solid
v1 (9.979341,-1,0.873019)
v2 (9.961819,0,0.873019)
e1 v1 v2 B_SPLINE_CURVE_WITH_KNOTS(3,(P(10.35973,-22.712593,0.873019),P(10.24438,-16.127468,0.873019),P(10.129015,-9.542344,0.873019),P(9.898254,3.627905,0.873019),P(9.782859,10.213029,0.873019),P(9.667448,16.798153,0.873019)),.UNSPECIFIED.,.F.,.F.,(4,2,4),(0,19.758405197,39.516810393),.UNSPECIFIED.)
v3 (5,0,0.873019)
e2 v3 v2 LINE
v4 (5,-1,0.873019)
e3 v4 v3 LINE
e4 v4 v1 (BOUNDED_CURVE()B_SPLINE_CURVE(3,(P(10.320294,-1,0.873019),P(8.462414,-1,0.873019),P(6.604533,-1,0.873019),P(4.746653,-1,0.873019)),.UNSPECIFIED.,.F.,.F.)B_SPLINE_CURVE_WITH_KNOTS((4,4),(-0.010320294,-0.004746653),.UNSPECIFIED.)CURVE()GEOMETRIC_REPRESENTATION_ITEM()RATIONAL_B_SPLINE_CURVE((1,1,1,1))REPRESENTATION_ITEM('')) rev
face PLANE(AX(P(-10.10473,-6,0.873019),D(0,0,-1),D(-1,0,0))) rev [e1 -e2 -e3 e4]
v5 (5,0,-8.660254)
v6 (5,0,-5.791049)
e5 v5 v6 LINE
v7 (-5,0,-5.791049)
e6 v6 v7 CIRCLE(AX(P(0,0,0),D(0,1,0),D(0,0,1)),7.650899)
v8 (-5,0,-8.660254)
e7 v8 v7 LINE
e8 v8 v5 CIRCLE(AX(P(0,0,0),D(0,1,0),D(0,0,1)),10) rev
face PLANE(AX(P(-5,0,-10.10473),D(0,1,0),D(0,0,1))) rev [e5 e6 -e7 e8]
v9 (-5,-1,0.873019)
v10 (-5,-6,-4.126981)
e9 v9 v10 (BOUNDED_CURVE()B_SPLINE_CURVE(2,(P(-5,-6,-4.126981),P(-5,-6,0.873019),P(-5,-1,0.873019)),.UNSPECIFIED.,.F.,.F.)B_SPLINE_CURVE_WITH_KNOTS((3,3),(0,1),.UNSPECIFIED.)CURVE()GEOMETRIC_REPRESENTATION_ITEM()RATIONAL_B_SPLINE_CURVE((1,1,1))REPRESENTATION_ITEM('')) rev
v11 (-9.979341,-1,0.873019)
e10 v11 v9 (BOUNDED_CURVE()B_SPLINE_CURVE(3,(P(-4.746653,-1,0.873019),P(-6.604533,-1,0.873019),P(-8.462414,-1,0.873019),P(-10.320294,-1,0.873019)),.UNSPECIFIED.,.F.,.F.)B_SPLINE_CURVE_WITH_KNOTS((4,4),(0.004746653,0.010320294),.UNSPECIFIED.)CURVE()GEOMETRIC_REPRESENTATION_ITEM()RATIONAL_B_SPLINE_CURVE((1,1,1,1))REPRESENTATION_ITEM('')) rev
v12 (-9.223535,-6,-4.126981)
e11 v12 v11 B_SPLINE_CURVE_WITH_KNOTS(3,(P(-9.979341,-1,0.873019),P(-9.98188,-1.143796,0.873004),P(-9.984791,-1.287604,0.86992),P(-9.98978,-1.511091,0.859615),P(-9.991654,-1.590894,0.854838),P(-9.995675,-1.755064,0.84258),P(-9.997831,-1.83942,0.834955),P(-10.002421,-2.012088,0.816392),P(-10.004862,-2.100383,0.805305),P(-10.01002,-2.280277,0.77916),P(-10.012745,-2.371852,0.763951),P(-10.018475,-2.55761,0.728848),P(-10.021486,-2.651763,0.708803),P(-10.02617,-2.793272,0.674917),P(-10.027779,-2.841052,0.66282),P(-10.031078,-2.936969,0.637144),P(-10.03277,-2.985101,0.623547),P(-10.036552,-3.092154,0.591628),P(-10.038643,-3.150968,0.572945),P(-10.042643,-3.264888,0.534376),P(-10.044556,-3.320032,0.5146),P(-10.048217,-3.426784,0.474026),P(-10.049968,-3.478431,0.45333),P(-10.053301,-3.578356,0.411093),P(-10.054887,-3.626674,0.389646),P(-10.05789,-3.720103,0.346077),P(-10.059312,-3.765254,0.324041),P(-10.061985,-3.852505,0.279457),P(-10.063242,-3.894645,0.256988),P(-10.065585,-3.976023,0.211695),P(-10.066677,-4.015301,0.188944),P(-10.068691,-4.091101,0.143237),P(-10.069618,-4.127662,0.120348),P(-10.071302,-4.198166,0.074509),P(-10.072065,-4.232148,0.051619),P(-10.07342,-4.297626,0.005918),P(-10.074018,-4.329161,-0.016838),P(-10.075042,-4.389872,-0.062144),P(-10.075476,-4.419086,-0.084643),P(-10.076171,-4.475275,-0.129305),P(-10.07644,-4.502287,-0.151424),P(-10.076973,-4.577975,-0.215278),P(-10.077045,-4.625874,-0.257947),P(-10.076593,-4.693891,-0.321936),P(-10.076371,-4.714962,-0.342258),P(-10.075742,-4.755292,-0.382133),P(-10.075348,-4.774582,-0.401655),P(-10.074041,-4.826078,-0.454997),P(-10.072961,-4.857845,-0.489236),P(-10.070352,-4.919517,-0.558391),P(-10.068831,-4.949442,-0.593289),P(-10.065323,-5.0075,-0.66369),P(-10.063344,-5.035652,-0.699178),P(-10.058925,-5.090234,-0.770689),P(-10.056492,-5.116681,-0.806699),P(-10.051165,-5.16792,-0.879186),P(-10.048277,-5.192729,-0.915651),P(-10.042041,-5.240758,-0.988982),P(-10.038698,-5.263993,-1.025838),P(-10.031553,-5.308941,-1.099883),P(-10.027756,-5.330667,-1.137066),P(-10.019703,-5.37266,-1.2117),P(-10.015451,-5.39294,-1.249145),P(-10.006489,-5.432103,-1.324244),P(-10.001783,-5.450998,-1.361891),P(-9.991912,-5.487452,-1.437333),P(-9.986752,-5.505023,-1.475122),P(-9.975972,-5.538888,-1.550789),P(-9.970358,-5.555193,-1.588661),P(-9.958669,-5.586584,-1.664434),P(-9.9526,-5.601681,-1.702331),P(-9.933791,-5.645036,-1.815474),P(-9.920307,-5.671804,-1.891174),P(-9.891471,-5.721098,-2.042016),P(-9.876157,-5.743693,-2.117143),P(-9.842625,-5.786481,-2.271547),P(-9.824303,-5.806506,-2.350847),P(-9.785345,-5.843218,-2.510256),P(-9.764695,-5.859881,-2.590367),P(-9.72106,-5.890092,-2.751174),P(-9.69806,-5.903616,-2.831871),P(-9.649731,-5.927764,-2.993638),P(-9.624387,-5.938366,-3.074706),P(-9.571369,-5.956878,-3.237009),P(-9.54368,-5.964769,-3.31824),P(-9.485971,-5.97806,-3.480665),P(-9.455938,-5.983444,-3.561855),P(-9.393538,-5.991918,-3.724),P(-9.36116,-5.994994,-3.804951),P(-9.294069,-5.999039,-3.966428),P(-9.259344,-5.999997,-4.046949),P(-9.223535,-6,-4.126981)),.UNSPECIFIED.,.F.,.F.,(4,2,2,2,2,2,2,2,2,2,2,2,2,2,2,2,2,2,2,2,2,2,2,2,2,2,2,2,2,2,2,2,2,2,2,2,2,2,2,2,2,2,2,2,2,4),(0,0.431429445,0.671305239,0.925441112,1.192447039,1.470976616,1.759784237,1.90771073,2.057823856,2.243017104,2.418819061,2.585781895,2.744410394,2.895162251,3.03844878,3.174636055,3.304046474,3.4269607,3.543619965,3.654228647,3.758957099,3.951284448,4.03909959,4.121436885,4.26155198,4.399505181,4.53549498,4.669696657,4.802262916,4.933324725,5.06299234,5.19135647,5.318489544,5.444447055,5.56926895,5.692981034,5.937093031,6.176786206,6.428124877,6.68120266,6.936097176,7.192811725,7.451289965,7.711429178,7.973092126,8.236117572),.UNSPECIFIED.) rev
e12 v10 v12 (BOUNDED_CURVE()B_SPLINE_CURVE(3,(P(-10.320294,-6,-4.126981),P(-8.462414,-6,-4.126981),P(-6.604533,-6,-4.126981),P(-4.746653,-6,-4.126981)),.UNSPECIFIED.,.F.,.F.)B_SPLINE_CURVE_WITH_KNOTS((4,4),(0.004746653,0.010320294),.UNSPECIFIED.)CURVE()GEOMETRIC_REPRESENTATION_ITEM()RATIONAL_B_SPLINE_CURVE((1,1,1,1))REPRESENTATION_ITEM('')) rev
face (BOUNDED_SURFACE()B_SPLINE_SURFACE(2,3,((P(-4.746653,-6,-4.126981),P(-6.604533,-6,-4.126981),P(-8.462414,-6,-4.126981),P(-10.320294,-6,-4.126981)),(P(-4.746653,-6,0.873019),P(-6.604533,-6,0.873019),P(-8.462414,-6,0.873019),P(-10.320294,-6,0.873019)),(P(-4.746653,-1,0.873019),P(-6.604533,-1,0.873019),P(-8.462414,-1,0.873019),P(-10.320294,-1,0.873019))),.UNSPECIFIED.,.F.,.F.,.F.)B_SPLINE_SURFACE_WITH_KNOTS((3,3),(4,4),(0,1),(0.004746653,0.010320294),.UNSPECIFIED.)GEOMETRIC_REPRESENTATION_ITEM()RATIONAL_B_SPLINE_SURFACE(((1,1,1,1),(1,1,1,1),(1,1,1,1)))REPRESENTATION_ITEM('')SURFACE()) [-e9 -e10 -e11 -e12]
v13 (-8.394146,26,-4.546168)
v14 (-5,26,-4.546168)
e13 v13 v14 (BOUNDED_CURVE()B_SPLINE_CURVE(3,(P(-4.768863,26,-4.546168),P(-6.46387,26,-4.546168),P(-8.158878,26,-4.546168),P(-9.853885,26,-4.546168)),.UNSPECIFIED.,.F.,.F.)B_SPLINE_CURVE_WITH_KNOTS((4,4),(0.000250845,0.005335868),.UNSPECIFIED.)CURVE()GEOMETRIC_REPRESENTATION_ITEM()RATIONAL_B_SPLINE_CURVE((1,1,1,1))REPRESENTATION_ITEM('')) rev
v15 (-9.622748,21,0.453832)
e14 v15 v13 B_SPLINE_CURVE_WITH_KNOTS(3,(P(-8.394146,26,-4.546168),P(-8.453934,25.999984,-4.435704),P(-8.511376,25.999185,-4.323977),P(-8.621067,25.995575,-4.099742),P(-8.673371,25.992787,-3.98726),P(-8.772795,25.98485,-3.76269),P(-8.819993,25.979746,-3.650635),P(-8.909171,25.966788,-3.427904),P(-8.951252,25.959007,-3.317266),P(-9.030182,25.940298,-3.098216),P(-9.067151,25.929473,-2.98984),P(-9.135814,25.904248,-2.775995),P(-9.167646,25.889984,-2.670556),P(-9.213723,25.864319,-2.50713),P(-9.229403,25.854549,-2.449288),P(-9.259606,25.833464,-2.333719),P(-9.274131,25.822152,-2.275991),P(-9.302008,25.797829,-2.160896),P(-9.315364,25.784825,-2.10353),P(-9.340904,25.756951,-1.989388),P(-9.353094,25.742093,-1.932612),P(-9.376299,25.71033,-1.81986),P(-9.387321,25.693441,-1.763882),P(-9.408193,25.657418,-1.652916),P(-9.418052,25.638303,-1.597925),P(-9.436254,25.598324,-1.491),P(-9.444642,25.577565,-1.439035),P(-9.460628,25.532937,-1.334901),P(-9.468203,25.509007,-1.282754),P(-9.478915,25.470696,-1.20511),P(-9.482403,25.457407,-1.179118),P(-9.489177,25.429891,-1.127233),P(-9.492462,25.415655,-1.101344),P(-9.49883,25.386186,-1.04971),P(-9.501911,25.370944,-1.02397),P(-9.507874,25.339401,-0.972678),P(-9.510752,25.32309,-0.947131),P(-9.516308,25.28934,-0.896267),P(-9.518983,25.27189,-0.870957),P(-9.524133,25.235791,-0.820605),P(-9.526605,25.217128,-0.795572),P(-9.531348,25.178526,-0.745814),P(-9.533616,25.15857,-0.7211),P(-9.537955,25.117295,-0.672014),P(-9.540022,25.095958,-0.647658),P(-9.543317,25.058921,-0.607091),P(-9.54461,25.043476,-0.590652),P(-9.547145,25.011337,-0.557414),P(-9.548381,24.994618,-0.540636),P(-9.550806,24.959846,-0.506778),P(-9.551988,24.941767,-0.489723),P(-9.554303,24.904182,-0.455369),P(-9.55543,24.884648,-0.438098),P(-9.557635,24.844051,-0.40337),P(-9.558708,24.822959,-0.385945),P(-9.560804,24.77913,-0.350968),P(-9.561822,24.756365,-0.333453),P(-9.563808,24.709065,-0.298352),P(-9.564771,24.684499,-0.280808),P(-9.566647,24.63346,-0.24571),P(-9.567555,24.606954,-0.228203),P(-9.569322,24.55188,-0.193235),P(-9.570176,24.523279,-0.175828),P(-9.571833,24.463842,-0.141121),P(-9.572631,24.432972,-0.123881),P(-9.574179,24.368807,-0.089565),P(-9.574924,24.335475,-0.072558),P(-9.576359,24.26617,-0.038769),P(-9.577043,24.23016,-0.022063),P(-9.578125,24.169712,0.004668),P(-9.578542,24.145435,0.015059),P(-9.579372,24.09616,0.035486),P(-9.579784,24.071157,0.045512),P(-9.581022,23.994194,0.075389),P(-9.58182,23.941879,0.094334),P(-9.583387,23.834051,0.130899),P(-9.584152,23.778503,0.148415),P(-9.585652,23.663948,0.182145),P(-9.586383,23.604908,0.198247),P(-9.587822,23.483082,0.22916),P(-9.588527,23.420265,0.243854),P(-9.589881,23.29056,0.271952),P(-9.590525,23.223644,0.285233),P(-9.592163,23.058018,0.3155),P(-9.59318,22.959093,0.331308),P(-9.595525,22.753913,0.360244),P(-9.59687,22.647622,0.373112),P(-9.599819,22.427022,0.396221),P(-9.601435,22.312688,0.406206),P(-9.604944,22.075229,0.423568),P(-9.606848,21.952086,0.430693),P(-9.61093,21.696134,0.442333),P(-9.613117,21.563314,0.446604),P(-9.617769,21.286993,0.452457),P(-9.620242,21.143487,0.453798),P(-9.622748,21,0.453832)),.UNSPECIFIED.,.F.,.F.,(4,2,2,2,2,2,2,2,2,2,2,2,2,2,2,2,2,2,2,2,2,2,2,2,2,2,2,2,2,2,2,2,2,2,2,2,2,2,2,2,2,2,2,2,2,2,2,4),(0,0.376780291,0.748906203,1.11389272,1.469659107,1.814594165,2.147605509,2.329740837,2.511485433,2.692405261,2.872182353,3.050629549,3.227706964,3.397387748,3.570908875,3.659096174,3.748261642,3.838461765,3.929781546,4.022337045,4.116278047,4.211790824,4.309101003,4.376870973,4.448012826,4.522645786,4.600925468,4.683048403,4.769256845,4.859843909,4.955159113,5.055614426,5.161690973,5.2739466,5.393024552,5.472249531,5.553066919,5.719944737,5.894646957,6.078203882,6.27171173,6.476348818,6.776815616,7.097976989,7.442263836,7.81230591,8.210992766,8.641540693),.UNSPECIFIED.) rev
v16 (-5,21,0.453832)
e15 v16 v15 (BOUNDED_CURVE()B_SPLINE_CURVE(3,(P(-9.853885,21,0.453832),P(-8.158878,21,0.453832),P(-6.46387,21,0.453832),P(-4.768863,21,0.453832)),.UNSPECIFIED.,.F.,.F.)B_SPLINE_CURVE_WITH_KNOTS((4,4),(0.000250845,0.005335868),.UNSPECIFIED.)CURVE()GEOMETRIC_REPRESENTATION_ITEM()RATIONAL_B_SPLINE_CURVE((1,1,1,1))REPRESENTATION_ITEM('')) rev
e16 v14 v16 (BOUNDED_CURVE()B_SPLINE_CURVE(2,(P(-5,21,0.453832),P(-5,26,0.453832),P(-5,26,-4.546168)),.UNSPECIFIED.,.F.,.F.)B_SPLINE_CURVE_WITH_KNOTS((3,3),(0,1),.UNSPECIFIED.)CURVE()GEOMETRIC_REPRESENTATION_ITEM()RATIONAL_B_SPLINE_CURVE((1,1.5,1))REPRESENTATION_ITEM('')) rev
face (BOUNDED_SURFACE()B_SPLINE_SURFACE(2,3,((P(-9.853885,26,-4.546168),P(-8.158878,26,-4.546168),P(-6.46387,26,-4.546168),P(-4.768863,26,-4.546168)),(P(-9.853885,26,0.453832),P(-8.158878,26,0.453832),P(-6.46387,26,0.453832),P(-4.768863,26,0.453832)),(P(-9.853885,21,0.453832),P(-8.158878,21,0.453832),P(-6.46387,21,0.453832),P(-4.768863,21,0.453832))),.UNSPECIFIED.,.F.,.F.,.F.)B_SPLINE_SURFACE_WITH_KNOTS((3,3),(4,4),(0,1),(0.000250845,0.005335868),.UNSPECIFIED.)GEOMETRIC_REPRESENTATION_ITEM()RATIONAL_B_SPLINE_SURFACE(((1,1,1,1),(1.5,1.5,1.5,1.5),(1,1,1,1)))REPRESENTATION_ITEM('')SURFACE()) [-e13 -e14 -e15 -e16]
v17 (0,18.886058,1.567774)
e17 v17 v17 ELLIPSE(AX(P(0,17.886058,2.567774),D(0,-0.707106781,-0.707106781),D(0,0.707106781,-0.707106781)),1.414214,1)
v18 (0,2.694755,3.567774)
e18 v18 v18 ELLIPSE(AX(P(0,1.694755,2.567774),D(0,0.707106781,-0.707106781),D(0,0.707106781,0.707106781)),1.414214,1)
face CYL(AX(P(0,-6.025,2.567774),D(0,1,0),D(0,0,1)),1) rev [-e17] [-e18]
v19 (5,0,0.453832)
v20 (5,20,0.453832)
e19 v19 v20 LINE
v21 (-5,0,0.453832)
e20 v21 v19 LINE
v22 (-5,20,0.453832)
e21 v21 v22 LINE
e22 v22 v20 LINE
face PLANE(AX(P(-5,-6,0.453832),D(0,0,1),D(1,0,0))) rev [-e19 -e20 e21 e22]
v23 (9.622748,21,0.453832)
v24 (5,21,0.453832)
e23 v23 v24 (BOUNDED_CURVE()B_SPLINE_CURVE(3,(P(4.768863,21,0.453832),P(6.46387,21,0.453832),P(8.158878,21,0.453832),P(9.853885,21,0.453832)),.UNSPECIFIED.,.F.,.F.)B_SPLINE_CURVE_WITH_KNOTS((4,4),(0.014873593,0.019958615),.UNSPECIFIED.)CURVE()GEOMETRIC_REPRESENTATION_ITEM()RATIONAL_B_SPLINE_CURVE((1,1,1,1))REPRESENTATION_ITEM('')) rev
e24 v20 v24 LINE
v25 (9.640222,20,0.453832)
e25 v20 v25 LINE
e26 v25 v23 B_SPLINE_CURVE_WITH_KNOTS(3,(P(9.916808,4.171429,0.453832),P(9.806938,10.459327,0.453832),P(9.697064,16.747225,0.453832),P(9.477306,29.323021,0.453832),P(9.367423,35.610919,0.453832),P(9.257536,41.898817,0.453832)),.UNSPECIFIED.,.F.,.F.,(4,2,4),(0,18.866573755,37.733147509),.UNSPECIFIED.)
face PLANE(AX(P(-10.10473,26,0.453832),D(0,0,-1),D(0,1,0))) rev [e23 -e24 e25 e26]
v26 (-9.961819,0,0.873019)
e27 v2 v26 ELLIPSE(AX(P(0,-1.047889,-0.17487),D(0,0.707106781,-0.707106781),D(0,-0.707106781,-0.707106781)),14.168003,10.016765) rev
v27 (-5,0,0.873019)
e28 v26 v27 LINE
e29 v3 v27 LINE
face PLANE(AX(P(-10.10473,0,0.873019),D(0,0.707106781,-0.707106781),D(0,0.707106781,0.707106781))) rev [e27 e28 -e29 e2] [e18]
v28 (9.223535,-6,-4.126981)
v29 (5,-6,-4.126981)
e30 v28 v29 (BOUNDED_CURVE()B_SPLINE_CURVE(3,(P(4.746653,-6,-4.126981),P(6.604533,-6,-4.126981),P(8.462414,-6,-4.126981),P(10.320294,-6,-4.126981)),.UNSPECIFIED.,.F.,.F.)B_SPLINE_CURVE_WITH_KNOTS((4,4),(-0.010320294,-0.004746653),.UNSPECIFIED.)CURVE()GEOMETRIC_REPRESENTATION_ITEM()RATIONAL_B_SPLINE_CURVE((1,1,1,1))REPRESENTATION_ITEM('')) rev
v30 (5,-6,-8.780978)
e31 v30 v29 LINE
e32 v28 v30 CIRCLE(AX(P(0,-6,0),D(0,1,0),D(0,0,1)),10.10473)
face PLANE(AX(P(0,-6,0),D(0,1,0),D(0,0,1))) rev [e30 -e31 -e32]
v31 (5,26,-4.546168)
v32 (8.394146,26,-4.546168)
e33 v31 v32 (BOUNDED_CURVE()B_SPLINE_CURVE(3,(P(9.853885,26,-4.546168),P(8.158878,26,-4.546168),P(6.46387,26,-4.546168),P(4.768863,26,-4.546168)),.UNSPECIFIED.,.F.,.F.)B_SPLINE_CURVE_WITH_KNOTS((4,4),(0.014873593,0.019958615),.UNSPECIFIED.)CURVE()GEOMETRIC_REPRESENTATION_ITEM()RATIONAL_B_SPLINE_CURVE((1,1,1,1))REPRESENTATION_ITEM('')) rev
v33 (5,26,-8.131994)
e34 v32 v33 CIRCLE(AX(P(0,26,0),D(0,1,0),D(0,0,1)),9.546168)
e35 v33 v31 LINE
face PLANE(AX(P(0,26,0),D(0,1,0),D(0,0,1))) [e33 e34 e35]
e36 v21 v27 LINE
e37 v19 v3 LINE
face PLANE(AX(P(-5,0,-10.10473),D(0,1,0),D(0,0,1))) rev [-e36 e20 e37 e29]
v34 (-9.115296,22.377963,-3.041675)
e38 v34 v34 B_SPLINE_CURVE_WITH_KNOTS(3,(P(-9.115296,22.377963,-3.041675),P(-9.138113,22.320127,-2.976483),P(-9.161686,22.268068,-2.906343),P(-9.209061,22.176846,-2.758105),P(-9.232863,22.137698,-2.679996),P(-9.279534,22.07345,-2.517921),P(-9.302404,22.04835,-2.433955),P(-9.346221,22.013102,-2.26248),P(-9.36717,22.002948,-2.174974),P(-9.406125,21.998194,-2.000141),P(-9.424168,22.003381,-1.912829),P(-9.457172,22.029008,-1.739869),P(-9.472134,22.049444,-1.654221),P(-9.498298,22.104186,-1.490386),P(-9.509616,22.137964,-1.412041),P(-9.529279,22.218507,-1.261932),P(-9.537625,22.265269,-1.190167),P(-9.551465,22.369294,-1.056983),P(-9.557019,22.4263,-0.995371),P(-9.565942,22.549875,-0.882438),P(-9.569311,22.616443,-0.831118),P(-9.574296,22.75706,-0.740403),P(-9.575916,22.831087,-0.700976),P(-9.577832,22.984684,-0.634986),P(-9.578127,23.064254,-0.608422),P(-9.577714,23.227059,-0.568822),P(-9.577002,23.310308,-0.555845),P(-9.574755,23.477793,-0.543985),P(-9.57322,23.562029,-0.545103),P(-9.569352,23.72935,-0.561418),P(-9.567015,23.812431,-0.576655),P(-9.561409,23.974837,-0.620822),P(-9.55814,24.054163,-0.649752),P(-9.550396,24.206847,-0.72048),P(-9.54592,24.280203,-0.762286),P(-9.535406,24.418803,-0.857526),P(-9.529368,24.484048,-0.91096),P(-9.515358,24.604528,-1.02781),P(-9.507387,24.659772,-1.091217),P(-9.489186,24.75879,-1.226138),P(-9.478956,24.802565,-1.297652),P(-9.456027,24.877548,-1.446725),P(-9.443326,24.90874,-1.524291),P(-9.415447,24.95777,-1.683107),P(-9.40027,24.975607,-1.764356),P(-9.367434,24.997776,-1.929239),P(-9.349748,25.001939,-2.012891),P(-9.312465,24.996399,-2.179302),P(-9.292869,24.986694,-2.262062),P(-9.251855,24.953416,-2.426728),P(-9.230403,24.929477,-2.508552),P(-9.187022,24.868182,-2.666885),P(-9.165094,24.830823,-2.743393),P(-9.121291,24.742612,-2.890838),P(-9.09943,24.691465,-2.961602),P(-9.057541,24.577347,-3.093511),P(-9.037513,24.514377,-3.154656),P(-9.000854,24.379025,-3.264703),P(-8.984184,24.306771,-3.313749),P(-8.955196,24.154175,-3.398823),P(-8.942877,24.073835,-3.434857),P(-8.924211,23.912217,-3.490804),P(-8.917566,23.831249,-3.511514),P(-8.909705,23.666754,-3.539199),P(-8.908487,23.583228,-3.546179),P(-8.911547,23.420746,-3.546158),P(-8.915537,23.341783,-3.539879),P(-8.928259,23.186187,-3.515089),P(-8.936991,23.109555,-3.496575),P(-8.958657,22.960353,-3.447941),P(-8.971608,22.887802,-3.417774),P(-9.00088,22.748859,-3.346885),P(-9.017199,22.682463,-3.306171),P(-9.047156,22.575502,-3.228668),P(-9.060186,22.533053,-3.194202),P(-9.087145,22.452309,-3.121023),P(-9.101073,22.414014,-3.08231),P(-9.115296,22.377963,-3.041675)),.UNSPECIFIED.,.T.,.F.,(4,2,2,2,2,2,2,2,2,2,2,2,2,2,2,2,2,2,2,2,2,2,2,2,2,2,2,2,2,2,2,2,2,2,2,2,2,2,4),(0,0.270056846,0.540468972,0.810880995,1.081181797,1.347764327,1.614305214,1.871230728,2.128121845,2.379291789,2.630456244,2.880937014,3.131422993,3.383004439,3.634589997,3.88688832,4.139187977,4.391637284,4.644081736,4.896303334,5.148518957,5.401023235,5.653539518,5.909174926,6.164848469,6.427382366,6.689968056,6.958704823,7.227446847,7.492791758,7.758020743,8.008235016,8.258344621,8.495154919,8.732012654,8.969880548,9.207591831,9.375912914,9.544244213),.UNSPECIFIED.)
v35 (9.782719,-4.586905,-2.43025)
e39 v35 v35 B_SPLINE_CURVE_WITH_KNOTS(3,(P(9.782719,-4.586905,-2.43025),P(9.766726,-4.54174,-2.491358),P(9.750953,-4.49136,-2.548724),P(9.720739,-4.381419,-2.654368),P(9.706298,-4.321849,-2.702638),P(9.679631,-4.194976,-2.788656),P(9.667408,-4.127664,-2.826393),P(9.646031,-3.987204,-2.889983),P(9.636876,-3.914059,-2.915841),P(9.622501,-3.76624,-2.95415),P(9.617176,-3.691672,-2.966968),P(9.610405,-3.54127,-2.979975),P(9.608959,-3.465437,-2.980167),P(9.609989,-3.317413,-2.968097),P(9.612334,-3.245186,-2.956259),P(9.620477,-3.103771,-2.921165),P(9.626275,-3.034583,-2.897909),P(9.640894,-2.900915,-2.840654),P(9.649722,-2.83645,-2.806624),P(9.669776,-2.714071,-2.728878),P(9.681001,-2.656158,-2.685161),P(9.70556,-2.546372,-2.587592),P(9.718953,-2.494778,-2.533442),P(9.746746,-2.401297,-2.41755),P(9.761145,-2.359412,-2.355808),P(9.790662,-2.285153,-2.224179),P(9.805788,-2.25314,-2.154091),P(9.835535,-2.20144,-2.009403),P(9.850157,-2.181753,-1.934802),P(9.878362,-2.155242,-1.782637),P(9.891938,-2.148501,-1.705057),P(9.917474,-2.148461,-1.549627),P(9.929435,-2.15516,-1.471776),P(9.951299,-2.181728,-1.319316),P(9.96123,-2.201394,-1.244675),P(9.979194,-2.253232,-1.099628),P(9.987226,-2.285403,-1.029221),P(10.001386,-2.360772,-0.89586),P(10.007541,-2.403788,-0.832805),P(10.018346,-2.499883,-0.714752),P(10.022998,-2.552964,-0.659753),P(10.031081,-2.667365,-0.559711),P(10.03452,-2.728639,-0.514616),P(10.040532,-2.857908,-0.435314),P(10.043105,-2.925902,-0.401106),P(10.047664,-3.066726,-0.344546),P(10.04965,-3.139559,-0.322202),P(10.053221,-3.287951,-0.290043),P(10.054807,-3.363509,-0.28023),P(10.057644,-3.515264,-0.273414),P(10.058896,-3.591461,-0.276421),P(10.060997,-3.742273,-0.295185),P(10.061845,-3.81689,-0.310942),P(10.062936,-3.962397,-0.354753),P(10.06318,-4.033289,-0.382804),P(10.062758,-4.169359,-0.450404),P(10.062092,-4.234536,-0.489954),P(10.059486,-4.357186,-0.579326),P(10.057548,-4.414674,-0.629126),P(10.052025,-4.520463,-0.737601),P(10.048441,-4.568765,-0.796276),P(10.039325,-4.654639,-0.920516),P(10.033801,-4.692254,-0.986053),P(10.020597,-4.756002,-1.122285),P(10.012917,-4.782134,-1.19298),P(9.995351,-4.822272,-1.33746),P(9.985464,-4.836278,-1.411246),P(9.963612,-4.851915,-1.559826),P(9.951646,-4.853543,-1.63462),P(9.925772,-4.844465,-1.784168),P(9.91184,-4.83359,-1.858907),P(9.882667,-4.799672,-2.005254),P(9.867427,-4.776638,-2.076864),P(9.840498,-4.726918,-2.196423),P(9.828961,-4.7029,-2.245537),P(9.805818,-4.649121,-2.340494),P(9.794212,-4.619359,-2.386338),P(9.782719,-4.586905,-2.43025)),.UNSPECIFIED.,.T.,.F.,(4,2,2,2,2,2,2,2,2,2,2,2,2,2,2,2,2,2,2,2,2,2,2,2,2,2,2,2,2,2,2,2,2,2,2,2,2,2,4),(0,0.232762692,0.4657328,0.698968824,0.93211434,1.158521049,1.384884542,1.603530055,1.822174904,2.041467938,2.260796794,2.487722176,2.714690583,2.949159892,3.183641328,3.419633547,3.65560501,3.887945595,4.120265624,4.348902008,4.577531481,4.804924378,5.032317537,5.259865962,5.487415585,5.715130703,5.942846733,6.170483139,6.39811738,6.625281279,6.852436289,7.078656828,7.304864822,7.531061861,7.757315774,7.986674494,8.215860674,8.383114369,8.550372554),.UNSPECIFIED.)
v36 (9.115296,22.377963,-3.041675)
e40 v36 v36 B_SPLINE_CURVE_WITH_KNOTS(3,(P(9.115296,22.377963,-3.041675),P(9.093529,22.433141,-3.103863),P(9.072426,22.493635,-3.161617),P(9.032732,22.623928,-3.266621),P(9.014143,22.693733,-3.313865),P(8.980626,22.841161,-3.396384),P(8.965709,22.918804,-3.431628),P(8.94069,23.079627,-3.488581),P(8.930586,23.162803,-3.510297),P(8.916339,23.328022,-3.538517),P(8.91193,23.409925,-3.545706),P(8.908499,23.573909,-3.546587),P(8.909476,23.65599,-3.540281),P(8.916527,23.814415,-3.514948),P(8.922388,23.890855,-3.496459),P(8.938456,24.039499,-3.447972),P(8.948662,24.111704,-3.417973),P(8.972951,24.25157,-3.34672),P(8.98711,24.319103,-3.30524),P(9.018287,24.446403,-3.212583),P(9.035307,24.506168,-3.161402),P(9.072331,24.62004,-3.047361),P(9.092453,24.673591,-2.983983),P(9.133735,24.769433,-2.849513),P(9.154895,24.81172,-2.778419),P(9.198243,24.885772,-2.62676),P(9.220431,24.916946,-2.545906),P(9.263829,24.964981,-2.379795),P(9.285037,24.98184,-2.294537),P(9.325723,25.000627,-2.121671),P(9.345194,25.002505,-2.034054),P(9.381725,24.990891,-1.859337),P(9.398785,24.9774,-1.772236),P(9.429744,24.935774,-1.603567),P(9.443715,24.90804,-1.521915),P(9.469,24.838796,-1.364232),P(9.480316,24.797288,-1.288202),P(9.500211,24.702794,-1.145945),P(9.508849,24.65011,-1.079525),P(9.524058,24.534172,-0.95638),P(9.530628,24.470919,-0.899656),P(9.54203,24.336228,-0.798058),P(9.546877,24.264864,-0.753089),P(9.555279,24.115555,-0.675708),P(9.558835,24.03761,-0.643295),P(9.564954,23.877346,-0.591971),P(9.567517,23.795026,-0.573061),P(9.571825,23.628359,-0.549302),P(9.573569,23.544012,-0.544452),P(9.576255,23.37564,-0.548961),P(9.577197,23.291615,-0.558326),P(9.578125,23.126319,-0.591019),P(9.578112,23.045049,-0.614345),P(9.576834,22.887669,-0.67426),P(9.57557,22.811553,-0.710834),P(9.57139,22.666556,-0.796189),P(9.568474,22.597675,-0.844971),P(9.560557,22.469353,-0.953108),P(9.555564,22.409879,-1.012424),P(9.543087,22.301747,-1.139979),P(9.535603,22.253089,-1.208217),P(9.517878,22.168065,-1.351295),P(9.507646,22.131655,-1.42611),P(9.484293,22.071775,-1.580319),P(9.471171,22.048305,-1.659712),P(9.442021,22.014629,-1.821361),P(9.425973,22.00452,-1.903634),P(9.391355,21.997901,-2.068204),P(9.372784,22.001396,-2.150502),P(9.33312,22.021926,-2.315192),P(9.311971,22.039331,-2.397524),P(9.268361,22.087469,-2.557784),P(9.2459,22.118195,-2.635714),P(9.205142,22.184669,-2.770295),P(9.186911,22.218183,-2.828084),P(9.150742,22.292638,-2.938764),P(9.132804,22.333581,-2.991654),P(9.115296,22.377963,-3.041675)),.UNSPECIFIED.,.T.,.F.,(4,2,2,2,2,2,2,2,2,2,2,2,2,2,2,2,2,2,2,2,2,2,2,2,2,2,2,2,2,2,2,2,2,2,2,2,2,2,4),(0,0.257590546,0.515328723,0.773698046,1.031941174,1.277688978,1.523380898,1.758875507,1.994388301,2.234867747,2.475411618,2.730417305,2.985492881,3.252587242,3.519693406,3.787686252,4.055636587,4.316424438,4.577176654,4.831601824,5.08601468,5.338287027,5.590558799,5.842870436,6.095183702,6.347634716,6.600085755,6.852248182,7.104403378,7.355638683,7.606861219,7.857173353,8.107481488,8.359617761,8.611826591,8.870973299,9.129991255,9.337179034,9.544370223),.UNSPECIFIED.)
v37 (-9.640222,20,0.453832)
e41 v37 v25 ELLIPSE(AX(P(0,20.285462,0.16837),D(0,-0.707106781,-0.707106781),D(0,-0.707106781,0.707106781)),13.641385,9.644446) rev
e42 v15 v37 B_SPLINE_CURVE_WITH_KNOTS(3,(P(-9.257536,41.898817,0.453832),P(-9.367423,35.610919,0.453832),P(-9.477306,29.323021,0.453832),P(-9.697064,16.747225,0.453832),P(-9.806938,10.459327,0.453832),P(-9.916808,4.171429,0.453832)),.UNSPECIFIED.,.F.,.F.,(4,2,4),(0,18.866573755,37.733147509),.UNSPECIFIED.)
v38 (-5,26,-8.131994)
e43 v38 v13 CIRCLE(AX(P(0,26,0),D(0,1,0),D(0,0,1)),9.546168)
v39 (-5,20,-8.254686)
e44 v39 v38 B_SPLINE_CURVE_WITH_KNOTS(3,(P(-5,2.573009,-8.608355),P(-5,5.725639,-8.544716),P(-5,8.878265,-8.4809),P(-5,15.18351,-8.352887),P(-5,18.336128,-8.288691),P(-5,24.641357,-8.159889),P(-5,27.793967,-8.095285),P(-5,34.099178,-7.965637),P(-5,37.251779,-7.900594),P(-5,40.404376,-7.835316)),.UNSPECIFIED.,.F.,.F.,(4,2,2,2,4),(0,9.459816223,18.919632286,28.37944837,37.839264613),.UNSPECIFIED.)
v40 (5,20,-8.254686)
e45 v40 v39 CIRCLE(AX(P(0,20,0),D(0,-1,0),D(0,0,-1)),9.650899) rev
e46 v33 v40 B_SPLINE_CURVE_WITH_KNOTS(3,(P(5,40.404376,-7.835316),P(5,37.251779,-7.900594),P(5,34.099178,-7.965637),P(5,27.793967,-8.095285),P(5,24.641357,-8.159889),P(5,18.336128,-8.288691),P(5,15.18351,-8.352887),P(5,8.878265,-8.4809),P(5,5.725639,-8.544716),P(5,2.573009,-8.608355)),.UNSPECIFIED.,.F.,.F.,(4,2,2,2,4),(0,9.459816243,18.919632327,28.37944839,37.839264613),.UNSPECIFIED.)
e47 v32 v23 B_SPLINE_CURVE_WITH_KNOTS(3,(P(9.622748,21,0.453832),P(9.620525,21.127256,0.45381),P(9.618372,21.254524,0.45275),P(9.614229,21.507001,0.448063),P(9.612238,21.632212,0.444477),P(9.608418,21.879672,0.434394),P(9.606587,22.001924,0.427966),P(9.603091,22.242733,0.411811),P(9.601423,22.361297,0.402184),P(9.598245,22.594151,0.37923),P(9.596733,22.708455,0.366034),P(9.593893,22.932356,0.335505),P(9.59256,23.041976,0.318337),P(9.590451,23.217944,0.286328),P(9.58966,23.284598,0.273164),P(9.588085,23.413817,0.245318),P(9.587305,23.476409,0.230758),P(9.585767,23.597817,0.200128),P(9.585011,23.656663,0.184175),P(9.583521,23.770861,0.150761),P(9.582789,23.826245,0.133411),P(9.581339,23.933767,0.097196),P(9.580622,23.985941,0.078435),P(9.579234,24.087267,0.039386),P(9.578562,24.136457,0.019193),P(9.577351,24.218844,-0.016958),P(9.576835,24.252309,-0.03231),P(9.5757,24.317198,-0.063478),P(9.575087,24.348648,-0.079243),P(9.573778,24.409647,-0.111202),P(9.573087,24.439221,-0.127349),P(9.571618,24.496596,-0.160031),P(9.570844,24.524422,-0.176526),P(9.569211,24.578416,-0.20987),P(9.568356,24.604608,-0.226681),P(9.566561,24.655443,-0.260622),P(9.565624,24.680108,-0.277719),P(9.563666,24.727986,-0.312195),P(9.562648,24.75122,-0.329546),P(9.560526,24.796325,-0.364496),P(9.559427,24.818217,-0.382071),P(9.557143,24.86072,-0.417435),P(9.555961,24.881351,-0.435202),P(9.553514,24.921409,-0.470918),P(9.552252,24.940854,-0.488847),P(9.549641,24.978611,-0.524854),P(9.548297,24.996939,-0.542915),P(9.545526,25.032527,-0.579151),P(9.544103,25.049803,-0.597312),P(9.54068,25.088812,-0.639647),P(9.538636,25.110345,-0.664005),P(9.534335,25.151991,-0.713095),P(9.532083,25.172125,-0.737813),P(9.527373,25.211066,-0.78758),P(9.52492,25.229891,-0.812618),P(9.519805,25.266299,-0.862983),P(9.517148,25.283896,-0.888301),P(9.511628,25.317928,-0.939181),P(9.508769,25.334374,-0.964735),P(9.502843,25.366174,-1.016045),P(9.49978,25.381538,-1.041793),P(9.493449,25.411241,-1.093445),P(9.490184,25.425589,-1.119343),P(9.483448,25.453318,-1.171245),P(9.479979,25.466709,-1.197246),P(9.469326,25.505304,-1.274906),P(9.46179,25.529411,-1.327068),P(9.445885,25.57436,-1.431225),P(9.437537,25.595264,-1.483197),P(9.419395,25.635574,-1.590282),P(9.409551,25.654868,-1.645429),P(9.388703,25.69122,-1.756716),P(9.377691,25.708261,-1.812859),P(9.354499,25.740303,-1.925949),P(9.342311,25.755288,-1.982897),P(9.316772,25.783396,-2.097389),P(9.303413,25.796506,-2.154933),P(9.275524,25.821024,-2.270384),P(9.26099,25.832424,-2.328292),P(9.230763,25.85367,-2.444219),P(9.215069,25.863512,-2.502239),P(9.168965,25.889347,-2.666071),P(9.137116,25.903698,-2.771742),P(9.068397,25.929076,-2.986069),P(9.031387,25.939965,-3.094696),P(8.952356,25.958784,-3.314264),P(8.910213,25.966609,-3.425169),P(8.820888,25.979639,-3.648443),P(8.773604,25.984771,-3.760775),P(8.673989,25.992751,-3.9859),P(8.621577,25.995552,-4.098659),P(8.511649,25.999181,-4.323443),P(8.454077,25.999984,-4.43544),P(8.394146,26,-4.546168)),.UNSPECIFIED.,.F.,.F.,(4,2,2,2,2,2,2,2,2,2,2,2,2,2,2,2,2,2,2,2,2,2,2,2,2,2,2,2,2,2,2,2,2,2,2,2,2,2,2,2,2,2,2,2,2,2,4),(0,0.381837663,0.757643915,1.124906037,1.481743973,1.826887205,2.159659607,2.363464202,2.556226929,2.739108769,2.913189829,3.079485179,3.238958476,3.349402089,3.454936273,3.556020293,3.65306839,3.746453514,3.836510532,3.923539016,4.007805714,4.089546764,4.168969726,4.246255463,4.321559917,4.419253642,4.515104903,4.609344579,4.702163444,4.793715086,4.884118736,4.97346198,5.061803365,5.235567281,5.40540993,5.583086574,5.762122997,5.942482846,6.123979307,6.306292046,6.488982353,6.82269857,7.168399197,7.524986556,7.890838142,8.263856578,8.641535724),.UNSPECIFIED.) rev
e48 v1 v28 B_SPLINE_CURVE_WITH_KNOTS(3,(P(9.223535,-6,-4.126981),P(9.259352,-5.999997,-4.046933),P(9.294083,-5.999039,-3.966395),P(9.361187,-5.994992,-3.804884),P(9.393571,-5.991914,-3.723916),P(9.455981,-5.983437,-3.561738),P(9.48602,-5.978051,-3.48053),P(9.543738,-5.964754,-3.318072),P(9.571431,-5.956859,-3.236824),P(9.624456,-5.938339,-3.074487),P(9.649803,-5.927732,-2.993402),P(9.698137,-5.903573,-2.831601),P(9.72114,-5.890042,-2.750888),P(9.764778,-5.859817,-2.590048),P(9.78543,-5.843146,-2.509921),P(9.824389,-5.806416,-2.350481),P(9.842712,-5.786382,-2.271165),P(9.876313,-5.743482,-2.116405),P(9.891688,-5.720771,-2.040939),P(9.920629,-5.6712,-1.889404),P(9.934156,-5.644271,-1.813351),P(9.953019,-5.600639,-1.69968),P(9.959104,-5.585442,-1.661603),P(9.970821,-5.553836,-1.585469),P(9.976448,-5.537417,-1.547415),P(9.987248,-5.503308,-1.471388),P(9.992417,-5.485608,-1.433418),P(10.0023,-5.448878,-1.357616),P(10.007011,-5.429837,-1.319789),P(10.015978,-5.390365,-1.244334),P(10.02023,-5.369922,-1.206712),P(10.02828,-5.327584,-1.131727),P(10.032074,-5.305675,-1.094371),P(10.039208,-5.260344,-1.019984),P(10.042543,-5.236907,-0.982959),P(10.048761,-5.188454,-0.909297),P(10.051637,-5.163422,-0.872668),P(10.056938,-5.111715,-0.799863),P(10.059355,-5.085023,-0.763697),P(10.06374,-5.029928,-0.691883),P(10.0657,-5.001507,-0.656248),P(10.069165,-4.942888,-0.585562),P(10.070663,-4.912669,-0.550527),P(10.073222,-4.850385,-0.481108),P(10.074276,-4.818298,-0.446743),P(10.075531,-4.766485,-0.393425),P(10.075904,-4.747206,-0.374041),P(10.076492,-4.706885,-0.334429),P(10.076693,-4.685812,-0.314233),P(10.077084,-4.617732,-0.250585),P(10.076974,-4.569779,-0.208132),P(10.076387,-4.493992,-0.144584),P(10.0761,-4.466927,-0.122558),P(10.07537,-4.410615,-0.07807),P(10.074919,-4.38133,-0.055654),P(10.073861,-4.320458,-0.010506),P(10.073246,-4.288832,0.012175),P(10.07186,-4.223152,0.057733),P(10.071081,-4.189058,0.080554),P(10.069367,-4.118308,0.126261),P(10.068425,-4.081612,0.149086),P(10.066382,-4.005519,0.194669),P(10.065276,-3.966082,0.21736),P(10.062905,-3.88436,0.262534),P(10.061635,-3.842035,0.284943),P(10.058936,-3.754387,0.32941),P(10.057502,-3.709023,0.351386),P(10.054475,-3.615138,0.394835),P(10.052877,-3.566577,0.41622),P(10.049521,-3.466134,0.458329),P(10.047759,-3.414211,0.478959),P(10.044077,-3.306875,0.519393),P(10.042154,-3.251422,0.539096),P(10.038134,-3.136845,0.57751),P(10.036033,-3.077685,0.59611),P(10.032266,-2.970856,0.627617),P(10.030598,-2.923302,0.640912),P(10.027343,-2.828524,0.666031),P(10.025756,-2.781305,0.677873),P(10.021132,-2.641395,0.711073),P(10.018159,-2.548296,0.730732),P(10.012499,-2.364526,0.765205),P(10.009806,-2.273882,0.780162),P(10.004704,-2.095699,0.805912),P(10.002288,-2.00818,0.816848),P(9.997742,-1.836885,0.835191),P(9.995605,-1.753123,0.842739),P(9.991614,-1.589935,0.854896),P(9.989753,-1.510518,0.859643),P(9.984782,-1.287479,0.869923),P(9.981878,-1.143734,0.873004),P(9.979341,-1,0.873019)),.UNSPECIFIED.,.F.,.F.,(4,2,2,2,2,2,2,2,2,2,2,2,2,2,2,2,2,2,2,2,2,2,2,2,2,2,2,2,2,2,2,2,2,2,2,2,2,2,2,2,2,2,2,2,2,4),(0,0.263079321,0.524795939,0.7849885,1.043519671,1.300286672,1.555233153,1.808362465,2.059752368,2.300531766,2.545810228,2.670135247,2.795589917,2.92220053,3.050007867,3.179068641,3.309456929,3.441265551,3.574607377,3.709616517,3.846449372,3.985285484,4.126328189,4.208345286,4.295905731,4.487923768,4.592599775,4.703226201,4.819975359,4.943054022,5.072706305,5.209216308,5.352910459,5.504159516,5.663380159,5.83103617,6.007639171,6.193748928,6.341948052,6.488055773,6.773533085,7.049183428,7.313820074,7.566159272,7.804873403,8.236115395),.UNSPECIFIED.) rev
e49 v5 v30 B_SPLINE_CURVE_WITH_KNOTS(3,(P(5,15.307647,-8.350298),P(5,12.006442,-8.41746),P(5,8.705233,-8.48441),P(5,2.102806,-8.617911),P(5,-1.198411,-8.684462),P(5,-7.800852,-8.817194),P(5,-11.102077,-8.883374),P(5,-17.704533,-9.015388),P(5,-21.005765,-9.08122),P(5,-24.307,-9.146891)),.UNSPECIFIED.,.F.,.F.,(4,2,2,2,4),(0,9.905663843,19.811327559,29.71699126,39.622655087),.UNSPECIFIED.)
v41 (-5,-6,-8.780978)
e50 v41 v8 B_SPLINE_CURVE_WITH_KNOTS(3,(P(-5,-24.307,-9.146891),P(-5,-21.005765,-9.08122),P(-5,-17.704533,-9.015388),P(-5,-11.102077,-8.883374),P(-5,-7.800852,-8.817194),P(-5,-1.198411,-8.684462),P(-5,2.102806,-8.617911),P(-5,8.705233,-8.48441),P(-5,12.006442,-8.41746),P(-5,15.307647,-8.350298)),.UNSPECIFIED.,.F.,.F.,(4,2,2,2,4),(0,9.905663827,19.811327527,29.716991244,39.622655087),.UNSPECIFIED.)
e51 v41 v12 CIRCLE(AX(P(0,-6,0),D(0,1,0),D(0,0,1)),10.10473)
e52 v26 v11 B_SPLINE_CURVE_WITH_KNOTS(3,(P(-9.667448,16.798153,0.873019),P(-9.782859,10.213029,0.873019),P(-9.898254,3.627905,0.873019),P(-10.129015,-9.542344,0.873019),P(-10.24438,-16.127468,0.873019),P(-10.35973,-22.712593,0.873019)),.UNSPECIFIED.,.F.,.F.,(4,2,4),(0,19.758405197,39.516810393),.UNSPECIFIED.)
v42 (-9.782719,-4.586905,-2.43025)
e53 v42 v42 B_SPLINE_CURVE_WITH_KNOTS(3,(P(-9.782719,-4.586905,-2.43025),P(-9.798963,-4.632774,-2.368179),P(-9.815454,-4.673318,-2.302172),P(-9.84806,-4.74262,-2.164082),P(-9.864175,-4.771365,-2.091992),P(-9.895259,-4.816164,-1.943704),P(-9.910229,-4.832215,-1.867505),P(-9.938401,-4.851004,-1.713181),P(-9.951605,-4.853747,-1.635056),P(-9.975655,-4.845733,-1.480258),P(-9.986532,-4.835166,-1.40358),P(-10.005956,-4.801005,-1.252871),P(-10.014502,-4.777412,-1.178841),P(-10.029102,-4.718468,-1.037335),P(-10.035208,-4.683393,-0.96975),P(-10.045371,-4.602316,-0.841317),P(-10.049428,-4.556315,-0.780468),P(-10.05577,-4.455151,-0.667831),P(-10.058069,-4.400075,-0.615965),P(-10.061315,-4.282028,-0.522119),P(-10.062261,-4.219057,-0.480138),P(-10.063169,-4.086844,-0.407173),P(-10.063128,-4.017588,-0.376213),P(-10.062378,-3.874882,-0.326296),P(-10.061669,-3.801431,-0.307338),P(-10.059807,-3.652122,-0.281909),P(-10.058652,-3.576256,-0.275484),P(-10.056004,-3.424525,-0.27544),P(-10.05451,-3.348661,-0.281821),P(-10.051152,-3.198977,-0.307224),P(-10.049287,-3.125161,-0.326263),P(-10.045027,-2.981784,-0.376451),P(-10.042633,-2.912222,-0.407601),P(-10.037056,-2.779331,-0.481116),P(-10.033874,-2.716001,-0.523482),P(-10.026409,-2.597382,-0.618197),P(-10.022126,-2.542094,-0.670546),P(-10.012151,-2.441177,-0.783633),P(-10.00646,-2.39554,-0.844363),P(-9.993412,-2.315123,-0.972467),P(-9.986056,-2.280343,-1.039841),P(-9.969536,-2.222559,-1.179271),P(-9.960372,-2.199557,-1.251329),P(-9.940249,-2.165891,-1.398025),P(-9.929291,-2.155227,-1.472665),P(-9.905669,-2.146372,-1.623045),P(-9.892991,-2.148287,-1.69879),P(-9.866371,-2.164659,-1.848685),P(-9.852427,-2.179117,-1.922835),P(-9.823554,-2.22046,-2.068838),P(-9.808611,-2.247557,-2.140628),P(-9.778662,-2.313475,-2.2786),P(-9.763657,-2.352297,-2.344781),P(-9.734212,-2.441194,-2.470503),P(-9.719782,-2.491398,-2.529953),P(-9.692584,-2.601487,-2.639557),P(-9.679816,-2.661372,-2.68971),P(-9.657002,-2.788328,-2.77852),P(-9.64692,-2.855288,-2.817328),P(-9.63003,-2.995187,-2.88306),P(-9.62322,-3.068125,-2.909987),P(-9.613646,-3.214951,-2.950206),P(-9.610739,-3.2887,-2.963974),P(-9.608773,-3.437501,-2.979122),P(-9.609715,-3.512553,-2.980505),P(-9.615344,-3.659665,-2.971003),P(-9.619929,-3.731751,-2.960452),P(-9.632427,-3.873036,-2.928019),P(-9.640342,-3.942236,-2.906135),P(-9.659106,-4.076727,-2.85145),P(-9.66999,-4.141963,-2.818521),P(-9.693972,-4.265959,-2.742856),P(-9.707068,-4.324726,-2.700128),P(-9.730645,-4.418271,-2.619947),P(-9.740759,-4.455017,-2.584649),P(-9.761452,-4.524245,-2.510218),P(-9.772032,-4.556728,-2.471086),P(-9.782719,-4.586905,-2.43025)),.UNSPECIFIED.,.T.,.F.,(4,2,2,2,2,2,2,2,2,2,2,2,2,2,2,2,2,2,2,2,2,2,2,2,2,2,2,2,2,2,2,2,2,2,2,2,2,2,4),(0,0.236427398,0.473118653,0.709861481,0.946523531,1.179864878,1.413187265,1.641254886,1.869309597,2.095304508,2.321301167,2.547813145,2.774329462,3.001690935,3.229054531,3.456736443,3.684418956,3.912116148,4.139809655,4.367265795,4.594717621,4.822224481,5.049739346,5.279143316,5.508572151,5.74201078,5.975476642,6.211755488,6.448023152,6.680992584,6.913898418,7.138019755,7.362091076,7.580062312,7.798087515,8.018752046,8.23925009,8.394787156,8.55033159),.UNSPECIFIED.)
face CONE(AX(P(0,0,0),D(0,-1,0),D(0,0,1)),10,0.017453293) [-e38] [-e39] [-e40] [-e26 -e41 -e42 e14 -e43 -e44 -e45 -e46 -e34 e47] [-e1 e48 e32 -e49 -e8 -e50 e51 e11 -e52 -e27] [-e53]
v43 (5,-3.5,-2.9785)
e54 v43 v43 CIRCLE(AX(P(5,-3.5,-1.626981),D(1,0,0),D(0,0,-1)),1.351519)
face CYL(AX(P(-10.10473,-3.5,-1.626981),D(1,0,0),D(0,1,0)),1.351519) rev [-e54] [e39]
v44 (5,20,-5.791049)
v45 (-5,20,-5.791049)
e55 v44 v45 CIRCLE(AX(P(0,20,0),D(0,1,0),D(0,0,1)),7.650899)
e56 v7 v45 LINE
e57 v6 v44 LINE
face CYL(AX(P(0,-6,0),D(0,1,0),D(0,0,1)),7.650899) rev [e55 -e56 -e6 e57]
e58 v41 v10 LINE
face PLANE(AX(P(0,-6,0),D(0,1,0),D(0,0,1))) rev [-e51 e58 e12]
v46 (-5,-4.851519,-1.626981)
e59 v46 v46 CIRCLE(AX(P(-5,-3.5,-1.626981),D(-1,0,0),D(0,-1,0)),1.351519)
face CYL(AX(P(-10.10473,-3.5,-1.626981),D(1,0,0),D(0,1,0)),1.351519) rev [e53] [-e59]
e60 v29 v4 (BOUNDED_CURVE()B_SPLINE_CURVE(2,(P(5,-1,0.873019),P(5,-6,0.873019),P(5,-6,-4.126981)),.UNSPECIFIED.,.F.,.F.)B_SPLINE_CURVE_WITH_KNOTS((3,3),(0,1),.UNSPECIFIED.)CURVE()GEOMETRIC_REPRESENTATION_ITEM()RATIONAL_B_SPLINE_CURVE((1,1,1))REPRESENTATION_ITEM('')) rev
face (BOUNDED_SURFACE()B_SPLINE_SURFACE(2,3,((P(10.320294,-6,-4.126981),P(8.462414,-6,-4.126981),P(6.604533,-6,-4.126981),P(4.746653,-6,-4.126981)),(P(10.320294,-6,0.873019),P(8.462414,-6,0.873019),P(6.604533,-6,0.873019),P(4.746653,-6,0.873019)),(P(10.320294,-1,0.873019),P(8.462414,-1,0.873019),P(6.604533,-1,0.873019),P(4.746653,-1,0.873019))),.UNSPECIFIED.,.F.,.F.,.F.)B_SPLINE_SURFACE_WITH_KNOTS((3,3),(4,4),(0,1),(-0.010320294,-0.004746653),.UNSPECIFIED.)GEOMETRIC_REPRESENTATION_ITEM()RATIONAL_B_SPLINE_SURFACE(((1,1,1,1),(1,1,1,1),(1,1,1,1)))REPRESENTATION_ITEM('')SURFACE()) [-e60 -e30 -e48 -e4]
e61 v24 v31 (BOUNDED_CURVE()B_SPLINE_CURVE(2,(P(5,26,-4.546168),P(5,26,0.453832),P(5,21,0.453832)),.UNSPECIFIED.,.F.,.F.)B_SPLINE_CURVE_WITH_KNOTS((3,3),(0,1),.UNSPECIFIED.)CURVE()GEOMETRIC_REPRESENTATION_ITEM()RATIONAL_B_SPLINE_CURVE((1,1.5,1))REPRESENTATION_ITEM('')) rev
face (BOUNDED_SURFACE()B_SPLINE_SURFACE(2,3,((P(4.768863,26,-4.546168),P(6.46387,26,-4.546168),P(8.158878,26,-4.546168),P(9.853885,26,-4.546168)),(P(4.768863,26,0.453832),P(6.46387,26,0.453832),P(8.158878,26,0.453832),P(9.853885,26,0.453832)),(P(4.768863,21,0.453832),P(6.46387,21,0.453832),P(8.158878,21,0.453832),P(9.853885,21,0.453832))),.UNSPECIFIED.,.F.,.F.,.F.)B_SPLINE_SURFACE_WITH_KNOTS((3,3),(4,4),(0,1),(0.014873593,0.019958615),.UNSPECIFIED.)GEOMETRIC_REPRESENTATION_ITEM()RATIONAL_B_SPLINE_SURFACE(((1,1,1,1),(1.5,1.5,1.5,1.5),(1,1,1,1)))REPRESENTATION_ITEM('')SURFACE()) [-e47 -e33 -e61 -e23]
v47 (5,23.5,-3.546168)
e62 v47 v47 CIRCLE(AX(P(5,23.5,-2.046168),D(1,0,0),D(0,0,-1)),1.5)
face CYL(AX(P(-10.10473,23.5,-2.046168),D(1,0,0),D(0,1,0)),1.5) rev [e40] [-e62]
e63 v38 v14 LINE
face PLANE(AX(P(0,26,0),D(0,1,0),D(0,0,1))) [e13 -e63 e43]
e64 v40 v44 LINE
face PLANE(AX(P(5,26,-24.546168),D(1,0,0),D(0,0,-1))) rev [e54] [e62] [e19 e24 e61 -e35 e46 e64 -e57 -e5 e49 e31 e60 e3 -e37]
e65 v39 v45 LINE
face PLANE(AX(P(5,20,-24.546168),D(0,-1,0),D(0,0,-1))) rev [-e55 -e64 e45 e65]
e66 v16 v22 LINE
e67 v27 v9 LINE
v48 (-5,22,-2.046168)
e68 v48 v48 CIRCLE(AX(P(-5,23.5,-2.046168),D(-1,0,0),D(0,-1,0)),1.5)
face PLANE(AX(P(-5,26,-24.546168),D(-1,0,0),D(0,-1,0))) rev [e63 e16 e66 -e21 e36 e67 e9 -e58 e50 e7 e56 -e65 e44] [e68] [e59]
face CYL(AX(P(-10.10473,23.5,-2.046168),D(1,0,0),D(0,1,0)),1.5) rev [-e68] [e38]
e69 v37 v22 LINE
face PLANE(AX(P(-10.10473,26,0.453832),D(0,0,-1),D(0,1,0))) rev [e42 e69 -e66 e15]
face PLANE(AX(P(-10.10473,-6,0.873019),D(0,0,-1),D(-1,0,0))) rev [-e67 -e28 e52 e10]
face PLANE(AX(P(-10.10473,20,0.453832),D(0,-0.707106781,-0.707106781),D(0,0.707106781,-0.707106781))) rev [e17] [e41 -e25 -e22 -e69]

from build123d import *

# Parameters (mm, degrees)
SKETCH1_R                     = 10
BOSS_EXTRUDE1_DEPTH           = 26
BOSS_EXTRUDE1_TAPER           = 1
BOSS_EXTRUDE1_OTHER_WAY_DEPTH = 6
BOSS_EXTRUDE1_OTHER_WAY_TAPER = -1
CUT_EXTRUDE1_DEPTH            = 30.668352709
CUT_EXTRUDE1_DEPTH_BACK       = 30.668352709
SKETCH3_W                     = 10
SKETCH3_H                     = 6
CUT_EXTRUDE2_DEPTH            = 25
CUT_EXTRUDE3_DEPTH            = 32.721577304
CUT_EXTRUDE3_DEPTH_BACK       = 32.721577304
SKETCH4_R                     = 1.5
FILLET2_SIZE                  = 5
CUT_EXTRUDE5_DEPTH            = 30.668352865
CUT_EXTRUDE5_DEPTH_BACK       = 30.668352865
SKETCH8_W                     = 10
SKETCH8_H                     = 6
CUT_EXTRUDE6_DEPTH            = 30.976934008
CUT_EXTRUDE7_DEPTH            = 30.632846395
CUT_EXTRUDE8_DEPTH            = 32.688371532
CUT_EXTRUDE8_DEPTH_BACK       = 32.688371532
SKETCH9_R                     = 1.351518808
FILLET3_SIZE                  = 5
SKETCH10_R                    = 1
CUT_EXTRUDE9_DEPTH            = 30.623606957


with BuildPart() as part:
    # Sketch1 → Boss-Extrude1 (new body)
    with BuildSketch(Plane(origin=(0, 0, 0), x_dir=(1, 0, 0), z_dir=(0, 1, 0))):
        Circle(SKETCH1_R)
    extrude(amount=BOSS_EXTRUDE1_DEPTH, taper=BOSS_EXTRUDE1_TAPER)

    # Sketch1 → Boss-Extrude1 other way (add)
    with BuildSketch(Plane(origin=(0, 0, 0), x_dir=(1, 0, 0), z_dir=(0, 1, 0))):
        Circle(SKETCH1_R)
    extrude(amount=-BOSS_EXTRUDE1_OTHER_WAY_DEPTH, taper=BOSS_EXTRUDE1_OTHER_WAY_TAPER)

    # Sketch2 → Cut-Extrude1 (cut, two sides: drawn at the far end of the back side and taken through both)
    with BuildSketch(Plane(origin=(0, 0, 0), x_dir=(0, 0, -1), z_dir=(1, 0, 0)).offset(-CUT_EXTRUDE1_DEPTH_BACK)):
        Polygon((-0.453831688, 26), (-0.453831688, 20), (-13.188542788, 7.2652889), (-13.188542788, 26), align=None)
    extrude(amount=CUT_EXTRUDE1_DEPTH + CUT_EXTRUDE1_DEPTH_BACK, mode=Mode.SUBTRACT)

    # Sketch3 → Cut-Extrude2 (cut)
    with BuildSketch(Plane.XY.offset(0.453831688)):
        with Locations((0, 23)):
            Rectangle(SKETCH3_W, SKETCH3_H)
    extrude(amount=-CUT_EXTRUDE2_DEPTH, mode=Mode.SUBTRACT)

    # Sketch4 → Cut-Extrude3 (cut, two sides: drawn at the far end of the back side and taken through both)
    with BuildSketch(Plane(origin=(-5, 0, 0), x_dir=(0, 0, -1), z_dir=(1, 0, 0)).offset(-CUT_EXTRUDE3_DEPTH_BACK)):
        with Locations((2.046168312, 23.5)):
            Circle(SKETCH4_R)
    extrude(amount=CUT_EXTRUDE3_DEPTH + CUT_EXTRUDE3_DEPTH_BACK, mode=Mode.SUBTRACT)

    # Fillet2
    # a fillet whose section is not a circle: 5 mm, written as the material it takes off along each edge
    with BuildSketch(Plane(origin=(-7.5, 26, 0.453831688), x_dir=(0, -1, 0), z_dir=(1, 0, 0))) as fillet2_piece_1:
        with BuildLine():
            Bezier((FILLET2_SIZE, 0), (0, 0), (0, FILLET2_SIZE), weights=[1, 1.5, 1])
            Line((0, FILLET2_SIZE), (0, 0))
            Line((0, 0), (FILLET2_SIZE, 0))
        make_face()
    extrude(amount=29.535374468, mode=Mode.SUBTRACT)
    with BuildSketch(Plane(origin=(-22.035374468, 26, 0.453831688), x_dir=(0, 0, -1), z_dir=(1, 0, 0))) as fillet2_piece_2:
        with BuildLine():
            Bezier((FILLET2_SIZE, 0), (0, 0), (0, -FILLET2_SIZE), weights=[1, 1.5, 1])
            Line((0, -FILLET2_SIZE), (0, 0))
            Line((0, 0), (FILLET2_SIZE, 0))
        make_face()
    extrude(amount=29.535374468, mode=Mode.SUBTRACT)

    # Sketch7 → Cut-Extrude5 (cut, two sides: drawn at the far end of the back side and taken through both)
    with BuildSketch(Plane(origin=(0, 0, 0), x_dir=(0, 0, -1), z_dir=(1, 0, 0)).offset(-CUT_EXTRUDE5_DEPTH_BACK)):
        Polygon((-0.873019237, -6), (-0.873019237, 0), (-11.31781305, 10.444793812), (-11.31781305, -6), align=None)
    extrude(amount=CUT_EXTRUDE5_DEPTH + CUT_EXTRUDE5_DEPTH_BACK, mode=Mode.SUBTRACT)

    # Sketch8 → Cut-Extrude6 (cut, through all)
    with BuildSketch(Plane.XY.offset(0.873019237)):
        with Locations((0, -3)):
            Rectangle(SKETCH8_W, SKETCH8_H)
    extrude(amount=-CUT_EXTRUDE6_DEPTH, mode=Mode.SUBTRACT)

    # Sketch6 → Cut-Extrude7 (cut, through all)
    with BuildSketch(Plane(origin=(0, 20, 0), x_dir=(1, 0, 0), z_dir=(0, 1, 0))):
        with BuildLine():
            Line((5, 5.791049209), (5, -0.453831688))
            Line((5, -0.453831688), (-5, -0.453831688))
            Line((-5, -0.453831688), (-5, 5.791049209))
            ThreePointArc((-5, 5.791049209), (0, 7.650898701), (5, 5.791049209))
        make_face()
    extrude(amount=-CUT_EXTRUDE7_DEPTH, mode=Mode.SUBTRACT)

    # Sketch9 → Cut-Extrude8 (cut, two sides: drawn at the far end of the back side and taken through both)
    with BuildSketch(Plane(origin=(-5, 0, 0), x_dir=(0, 0, -1), z_dir=(1, 0, 0)).offset(-CUT_EXTRUDE8_DEPTH_BACK)):
        with Locations((1.626980763, -3.5)):
            Circle(SKETCH9_R)
    extrude(amount=CUT_EXTRUDE8_DEPTH + CUT_EXTRUDE8_DEPTH_BACK, mode=Mode.SUBTRACT)

    # Fillet3
    # a fillet whose section is not a circle: 5 mm, written as the material it takes off along each edge
    with BuildSketch(Plane(origin=(22.566946591, -6, 0.873019237), x_dir=(0, 0, -1), z_dir=(-1, 0, 0))) as fillet3_piece_1:
        with BuildLine():
            Bezier((FILLET3_SIZE, 0), (0, 0), (0, -FILLET3_SIZE), weights=[1, 1, 1])
            Line((0, -FILLET3_SIZE), (0, 0))
            Line((0, 0), (FILLET3_SIZE, 0))
        make_face()
    extrude(amount=30.066946591, mode=Mode.SUBTRACT)
    with BuildSketch(Plane(origin=(7.5, -6, 0.873019237), x_dir=(0, 1, 0), z_dir=(-1, 0, 0))) as fillet3_piece_2:
        with BuildLine():
            Bezier((FILLET3_SIZE, 0), (0, 0), (0, FILLET3_SIZE), weights=[1, 1, 1])
            Line((0, FILLET3_SIZE), (0, 0))
            Line((0, 0), (FILLET3_SIZE, 0))
        make_face()
    extrude(amount=30.066946591, mode=Mode.SUBTRACT)

    # Sketch10 → Cut-Extrude9 (cut, through all)
    with BuildSketch(Plane(origin=(0, 20, 0), x_dir=(1, 0, 0), z_dir=(0, 1, 0))):
        with Locations(Location((0, -2.56777392, 0), (0, 0, 270))):
            Circle(SKETCH10_R)
    extrude(amount=-CUT_EXTRUDE9_DEPTH, mode=Mode.SUBTRACT)


solid = part.part
